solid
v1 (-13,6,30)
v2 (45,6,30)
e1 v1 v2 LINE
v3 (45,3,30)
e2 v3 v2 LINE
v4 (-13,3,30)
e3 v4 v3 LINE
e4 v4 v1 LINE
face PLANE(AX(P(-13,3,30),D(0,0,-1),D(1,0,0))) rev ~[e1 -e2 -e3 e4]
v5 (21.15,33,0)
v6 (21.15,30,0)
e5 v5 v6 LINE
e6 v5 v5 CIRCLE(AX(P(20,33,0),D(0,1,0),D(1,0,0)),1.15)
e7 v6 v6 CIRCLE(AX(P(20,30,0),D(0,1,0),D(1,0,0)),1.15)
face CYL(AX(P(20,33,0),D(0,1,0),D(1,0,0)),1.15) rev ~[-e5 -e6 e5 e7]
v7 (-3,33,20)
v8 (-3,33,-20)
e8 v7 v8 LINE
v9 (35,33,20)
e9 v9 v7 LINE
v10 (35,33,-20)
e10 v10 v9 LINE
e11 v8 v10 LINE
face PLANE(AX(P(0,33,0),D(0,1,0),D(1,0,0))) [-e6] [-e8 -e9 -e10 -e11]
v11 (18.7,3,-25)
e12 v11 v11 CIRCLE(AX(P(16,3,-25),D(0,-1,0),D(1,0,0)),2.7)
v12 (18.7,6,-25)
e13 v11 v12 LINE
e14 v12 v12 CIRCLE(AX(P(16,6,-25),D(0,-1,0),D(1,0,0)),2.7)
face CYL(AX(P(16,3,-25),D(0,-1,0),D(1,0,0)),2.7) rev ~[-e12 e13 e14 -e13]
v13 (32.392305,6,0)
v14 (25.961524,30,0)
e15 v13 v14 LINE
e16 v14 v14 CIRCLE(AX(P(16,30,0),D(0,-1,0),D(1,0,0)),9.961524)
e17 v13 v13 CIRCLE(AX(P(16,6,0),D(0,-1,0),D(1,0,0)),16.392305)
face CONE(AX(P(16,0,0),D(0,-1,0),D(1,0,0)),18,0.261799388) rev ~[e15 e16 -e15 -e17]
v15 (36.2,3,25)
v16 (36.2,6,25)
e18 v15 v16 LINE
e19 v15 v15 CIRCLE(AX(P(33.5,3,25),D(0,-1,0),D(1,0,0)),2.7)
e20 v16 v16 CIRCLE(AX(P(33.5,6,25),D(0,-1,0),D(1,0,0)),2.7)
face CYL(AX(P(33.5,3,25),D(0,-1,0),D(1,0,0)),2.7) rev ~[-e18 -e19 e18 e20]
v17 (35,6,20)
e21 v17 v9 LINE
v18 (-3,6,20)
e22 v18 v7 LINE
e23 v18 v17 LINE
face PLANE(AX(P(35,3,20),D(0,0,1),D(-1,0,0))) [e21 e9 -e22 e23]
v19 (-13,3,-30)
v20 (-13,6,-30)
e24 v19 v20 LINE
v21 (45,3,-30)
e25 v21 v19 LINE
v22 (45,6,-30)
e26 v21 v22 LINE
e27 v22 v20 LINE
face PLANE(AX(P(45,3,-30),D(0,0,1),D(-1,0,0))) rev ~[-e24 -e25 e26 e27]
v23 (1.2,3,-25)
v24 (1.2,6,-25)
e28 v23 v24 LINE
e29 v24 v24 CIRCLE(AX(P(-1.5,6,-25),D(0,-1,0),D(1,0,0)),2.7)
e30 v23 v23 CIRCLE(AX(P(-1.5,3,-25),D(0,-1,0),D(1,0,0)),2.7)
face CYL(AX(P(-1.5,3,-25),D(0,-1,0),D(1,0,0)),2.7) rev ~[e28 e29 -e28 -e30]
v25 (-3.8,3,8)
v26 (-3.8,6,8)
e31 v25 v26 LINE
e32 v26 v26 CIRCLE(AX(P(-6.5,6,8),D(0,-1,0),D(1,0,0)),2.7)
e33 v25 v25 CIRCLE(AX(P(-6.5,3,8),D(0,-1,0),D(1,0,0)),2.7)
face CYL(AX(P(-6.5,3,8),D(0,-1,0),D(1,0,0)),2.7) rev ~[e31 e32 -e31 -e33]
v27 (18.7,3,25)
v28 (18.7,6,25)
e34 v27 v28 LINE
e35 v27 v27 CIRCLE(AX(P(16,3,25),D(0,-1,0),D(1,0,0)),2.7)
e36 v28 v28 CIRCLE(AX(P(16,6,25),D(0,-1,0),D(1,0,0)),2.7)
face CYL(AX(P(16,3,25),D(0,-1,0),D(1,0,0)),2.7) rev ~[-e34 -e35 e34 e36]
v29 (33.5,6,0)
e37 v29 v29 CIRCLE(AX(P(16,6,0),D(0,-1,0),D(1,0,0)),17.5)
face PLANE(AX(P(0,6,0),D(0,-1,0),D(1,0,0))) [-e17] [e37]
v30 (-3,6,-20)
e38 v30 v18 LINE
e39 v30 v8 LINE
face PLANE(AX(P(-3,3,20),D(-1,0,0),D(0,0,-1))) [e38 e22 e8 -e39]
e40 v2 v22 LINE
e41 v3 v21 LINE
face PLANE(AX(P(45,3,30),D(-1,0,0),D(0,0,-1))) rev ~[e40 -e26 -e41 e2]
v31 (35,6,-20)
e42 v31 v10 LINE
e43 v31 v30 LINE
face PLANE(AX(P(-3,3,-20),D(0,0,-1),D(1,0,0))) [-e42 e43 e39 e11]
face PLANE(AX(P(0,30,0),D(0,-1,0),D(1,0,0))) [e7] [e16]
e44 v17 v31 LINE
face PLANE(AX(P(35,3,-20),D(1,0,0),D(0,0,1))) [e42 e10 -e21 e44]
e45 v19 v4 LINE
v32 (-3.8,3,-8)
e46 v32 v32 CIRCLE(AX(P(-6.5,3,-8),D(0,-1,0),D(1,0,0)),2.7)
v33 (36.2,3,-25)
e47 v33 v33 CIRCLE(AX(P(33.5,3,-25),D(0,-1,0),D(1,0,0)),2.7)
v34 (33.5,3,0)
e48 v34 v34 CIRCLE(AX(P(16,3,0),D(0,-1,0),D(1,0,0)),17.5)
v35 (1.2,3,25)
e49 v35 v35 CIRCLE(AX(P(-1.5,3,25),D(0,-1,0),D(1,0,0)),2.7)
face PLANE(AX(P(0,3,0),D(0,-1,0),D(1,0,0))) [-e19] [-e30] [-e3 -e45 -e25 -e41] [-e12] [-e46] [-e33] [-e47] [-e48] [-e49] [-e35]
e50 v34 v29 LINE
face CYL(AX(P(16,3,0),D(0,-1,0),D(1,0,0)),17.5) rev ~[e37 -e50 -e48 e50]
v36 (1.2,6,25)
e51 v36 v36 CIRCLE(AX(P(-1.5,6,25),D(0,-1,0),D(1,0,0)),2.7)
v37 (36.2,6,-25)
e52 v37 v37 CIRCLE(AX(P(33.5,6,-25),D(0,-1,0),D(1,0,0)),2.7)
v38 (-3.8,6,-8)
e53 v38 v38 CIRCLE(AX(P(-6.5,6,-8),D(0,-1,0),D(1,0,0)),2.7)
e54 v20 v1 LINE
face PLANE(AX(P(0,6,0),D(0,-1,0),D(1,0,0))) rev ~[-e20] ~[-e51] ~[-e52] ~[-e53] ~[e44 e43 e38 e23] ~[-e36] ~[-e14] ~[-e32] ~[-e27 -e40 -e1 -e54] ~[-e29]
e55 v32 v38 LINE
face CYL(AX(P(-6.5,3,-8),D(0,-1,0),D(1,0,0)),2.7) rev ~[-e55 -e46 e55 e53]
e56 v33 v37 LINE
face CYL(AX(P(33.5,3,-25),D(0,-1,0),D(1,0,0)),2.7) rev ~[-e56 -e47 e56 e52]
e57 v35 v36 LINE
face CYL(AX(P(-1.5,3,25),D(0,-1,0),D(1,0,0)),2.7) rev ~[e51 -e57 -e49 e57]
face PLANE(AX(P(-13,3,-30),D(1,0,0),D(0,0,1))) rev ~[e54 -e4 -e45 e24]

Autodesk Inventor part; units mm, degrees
ref_plane "YZ Plane" through (0, 0, 0) normal (1, 0, 0) x (0, 1, 0)
ref_plane "XZ Plane" through (0, 0, 0) normal (0, 1, 0) x (-1, 0, 0)
ref_plane "XY Plane" through (0, 0, 0) normal (0, 0, 1) x (1, 0, 0)
ref_plane "Work Plane5" through (0, 3, 0) normal (0, 1, 0) x (1, 0, 0)
sketch "Sketch45" plane through (0, 3, 0) normal (0, 1, 0) x (1, 0, 0)
  line L0 (35, -20) -> (-3, -20)
  line L1 (-3, -20) -> (-3, 20)
  line L2 (-3, 20) -> (35, 20)
  line L3 (35, 20) -> (35, -20)
  point P0 (0, 0)
  dimension "d142" = 38
  dimension "d143" = 40
extrude "Extrusion34" add sketch "Sketch45" along normal blind 30
ref_plane "Work Plane2" through (0, 0, 0) normal (0, -1, 0) x (1, 0, 0)
sketch "Sketch47" plane through (0, 0, 0) normal (0, -1, 0) x (1, 0, 0)
  circle A0 centre (16, 0) radius 18
  point P0 (0, 0)
  dimension "d146" = 36
extrude "Extrusion35" cut sketch "Sketch47" against normal blind 30 draft -15
ref_plane "Work Plane1" through (0, 3, 0) normal (0, 1, 0) x (1, 0, 0)
sketch "Sketch74" plane through (0, 33, 0) normal (0, 1, 0) x (1, 0, 0)
  circle A0 centre (20, 0) radius 1.15
  point P0 (0, 0)
  dimension "d210" = 2.3
extrude "Extrusion51" cut sketch "Sketch74" against normal blind 10
sketch "Sketch77" plane through (0, 3, 0) normal (0, -1, 0) x (1, 0, 0)
  circle A0 centre (16, 0) radius 17.5
  point P0 (0, 0)
  dimension "d219" = 35
sketch "Sketch78" plane through (0, 3, 0) normal (0, -1, 0) x (1, 0, 0)
  line L0 (45, -30) -> (-13, -30)
  line L1 (-13, -30) -> (-13, 30)
  line L2 (-13, 30) -> (45, 30)
  line L3 (45, 30) -> (45, -30)
  line L4 (45, -30) -> (-13, 30) construction
  line L5 (-13, -30) -> (45, 30) construction
  point P0 (0, 0)
  point P1 (16, 0)
  dimension "d220" = 58
  dimension "d221" = 60
extrude "Extrusion53" add sketch "Sketch78" against normal blind 3
extrude "Extrusion54" cut sketch "Sketch77" against normal blind 3
sketch "Sketch81" plane through (0, 3, 0) normal (0, -1, 0) x (1, 0, 0)
  circle A0 centre (33.5, -25) radius 2.7
  line L0 (-13, -30) -> (45, -30) projected
  line L1 (45, -30) -> (45, 30) projected
  circle A1 centre (16, -25) radius 2.7
  circle A2 centre (-1.5, -25) radius 2.7
  circle A3 centre (-6.5, -8) radius 2.7
  circle A4 centre (-6.5, 8) radius 2.7
  circle A5 centre (-1.5, 25) radius 2.7
  circle A6 centre (16, 25) radius 2.7
  circle A7 centre (33.5, 25) radius 2.7
  point P0 (0, 0)
  dimension "mag_D" = 5.4
  dimension "d232" = 5
  dimension "d233" = 11.5
  dimension "d234" = 5.4
  dimension "d235" = 17.5
  dimension "d236" = 5.4
  dimension "d237" = 17.5
  dimension "d238" = 5.4
  dimension "d239" = 5
  dimension "d240" = 17
  dimension "d241" = 5.4
  dimension "d242" = 16
  dimension "d243" = 5.4
  dimension "d244" = 17
  dimension "d245" = 5.4
  dimension "d246" = 17.5
  dimension "d247" = 5.4
  dimension "d248" = 17.5
  dimension "d249" = 5
extrude "Extrusion56" cut sketch "Sketch81" against normal blind 30
equation "\"d234\" = mag_D"
equation "\"d236\" = mag_D"
equation "\"d237\" = d235"
equation "\"d238\" = mag_D"
equation "\"d241\" = mag_D"
equation "\"d243\" = mag_D"
equation "\"d244\" = d240"
equation "\"d245\" = mag_D"
equation "\"d246\" = d235"
equation "\"d247\" = mag_D"
equation "\"d248\" = d235"
equation "\"d249\" = d239"
properties part number "liquid_port_v02"
